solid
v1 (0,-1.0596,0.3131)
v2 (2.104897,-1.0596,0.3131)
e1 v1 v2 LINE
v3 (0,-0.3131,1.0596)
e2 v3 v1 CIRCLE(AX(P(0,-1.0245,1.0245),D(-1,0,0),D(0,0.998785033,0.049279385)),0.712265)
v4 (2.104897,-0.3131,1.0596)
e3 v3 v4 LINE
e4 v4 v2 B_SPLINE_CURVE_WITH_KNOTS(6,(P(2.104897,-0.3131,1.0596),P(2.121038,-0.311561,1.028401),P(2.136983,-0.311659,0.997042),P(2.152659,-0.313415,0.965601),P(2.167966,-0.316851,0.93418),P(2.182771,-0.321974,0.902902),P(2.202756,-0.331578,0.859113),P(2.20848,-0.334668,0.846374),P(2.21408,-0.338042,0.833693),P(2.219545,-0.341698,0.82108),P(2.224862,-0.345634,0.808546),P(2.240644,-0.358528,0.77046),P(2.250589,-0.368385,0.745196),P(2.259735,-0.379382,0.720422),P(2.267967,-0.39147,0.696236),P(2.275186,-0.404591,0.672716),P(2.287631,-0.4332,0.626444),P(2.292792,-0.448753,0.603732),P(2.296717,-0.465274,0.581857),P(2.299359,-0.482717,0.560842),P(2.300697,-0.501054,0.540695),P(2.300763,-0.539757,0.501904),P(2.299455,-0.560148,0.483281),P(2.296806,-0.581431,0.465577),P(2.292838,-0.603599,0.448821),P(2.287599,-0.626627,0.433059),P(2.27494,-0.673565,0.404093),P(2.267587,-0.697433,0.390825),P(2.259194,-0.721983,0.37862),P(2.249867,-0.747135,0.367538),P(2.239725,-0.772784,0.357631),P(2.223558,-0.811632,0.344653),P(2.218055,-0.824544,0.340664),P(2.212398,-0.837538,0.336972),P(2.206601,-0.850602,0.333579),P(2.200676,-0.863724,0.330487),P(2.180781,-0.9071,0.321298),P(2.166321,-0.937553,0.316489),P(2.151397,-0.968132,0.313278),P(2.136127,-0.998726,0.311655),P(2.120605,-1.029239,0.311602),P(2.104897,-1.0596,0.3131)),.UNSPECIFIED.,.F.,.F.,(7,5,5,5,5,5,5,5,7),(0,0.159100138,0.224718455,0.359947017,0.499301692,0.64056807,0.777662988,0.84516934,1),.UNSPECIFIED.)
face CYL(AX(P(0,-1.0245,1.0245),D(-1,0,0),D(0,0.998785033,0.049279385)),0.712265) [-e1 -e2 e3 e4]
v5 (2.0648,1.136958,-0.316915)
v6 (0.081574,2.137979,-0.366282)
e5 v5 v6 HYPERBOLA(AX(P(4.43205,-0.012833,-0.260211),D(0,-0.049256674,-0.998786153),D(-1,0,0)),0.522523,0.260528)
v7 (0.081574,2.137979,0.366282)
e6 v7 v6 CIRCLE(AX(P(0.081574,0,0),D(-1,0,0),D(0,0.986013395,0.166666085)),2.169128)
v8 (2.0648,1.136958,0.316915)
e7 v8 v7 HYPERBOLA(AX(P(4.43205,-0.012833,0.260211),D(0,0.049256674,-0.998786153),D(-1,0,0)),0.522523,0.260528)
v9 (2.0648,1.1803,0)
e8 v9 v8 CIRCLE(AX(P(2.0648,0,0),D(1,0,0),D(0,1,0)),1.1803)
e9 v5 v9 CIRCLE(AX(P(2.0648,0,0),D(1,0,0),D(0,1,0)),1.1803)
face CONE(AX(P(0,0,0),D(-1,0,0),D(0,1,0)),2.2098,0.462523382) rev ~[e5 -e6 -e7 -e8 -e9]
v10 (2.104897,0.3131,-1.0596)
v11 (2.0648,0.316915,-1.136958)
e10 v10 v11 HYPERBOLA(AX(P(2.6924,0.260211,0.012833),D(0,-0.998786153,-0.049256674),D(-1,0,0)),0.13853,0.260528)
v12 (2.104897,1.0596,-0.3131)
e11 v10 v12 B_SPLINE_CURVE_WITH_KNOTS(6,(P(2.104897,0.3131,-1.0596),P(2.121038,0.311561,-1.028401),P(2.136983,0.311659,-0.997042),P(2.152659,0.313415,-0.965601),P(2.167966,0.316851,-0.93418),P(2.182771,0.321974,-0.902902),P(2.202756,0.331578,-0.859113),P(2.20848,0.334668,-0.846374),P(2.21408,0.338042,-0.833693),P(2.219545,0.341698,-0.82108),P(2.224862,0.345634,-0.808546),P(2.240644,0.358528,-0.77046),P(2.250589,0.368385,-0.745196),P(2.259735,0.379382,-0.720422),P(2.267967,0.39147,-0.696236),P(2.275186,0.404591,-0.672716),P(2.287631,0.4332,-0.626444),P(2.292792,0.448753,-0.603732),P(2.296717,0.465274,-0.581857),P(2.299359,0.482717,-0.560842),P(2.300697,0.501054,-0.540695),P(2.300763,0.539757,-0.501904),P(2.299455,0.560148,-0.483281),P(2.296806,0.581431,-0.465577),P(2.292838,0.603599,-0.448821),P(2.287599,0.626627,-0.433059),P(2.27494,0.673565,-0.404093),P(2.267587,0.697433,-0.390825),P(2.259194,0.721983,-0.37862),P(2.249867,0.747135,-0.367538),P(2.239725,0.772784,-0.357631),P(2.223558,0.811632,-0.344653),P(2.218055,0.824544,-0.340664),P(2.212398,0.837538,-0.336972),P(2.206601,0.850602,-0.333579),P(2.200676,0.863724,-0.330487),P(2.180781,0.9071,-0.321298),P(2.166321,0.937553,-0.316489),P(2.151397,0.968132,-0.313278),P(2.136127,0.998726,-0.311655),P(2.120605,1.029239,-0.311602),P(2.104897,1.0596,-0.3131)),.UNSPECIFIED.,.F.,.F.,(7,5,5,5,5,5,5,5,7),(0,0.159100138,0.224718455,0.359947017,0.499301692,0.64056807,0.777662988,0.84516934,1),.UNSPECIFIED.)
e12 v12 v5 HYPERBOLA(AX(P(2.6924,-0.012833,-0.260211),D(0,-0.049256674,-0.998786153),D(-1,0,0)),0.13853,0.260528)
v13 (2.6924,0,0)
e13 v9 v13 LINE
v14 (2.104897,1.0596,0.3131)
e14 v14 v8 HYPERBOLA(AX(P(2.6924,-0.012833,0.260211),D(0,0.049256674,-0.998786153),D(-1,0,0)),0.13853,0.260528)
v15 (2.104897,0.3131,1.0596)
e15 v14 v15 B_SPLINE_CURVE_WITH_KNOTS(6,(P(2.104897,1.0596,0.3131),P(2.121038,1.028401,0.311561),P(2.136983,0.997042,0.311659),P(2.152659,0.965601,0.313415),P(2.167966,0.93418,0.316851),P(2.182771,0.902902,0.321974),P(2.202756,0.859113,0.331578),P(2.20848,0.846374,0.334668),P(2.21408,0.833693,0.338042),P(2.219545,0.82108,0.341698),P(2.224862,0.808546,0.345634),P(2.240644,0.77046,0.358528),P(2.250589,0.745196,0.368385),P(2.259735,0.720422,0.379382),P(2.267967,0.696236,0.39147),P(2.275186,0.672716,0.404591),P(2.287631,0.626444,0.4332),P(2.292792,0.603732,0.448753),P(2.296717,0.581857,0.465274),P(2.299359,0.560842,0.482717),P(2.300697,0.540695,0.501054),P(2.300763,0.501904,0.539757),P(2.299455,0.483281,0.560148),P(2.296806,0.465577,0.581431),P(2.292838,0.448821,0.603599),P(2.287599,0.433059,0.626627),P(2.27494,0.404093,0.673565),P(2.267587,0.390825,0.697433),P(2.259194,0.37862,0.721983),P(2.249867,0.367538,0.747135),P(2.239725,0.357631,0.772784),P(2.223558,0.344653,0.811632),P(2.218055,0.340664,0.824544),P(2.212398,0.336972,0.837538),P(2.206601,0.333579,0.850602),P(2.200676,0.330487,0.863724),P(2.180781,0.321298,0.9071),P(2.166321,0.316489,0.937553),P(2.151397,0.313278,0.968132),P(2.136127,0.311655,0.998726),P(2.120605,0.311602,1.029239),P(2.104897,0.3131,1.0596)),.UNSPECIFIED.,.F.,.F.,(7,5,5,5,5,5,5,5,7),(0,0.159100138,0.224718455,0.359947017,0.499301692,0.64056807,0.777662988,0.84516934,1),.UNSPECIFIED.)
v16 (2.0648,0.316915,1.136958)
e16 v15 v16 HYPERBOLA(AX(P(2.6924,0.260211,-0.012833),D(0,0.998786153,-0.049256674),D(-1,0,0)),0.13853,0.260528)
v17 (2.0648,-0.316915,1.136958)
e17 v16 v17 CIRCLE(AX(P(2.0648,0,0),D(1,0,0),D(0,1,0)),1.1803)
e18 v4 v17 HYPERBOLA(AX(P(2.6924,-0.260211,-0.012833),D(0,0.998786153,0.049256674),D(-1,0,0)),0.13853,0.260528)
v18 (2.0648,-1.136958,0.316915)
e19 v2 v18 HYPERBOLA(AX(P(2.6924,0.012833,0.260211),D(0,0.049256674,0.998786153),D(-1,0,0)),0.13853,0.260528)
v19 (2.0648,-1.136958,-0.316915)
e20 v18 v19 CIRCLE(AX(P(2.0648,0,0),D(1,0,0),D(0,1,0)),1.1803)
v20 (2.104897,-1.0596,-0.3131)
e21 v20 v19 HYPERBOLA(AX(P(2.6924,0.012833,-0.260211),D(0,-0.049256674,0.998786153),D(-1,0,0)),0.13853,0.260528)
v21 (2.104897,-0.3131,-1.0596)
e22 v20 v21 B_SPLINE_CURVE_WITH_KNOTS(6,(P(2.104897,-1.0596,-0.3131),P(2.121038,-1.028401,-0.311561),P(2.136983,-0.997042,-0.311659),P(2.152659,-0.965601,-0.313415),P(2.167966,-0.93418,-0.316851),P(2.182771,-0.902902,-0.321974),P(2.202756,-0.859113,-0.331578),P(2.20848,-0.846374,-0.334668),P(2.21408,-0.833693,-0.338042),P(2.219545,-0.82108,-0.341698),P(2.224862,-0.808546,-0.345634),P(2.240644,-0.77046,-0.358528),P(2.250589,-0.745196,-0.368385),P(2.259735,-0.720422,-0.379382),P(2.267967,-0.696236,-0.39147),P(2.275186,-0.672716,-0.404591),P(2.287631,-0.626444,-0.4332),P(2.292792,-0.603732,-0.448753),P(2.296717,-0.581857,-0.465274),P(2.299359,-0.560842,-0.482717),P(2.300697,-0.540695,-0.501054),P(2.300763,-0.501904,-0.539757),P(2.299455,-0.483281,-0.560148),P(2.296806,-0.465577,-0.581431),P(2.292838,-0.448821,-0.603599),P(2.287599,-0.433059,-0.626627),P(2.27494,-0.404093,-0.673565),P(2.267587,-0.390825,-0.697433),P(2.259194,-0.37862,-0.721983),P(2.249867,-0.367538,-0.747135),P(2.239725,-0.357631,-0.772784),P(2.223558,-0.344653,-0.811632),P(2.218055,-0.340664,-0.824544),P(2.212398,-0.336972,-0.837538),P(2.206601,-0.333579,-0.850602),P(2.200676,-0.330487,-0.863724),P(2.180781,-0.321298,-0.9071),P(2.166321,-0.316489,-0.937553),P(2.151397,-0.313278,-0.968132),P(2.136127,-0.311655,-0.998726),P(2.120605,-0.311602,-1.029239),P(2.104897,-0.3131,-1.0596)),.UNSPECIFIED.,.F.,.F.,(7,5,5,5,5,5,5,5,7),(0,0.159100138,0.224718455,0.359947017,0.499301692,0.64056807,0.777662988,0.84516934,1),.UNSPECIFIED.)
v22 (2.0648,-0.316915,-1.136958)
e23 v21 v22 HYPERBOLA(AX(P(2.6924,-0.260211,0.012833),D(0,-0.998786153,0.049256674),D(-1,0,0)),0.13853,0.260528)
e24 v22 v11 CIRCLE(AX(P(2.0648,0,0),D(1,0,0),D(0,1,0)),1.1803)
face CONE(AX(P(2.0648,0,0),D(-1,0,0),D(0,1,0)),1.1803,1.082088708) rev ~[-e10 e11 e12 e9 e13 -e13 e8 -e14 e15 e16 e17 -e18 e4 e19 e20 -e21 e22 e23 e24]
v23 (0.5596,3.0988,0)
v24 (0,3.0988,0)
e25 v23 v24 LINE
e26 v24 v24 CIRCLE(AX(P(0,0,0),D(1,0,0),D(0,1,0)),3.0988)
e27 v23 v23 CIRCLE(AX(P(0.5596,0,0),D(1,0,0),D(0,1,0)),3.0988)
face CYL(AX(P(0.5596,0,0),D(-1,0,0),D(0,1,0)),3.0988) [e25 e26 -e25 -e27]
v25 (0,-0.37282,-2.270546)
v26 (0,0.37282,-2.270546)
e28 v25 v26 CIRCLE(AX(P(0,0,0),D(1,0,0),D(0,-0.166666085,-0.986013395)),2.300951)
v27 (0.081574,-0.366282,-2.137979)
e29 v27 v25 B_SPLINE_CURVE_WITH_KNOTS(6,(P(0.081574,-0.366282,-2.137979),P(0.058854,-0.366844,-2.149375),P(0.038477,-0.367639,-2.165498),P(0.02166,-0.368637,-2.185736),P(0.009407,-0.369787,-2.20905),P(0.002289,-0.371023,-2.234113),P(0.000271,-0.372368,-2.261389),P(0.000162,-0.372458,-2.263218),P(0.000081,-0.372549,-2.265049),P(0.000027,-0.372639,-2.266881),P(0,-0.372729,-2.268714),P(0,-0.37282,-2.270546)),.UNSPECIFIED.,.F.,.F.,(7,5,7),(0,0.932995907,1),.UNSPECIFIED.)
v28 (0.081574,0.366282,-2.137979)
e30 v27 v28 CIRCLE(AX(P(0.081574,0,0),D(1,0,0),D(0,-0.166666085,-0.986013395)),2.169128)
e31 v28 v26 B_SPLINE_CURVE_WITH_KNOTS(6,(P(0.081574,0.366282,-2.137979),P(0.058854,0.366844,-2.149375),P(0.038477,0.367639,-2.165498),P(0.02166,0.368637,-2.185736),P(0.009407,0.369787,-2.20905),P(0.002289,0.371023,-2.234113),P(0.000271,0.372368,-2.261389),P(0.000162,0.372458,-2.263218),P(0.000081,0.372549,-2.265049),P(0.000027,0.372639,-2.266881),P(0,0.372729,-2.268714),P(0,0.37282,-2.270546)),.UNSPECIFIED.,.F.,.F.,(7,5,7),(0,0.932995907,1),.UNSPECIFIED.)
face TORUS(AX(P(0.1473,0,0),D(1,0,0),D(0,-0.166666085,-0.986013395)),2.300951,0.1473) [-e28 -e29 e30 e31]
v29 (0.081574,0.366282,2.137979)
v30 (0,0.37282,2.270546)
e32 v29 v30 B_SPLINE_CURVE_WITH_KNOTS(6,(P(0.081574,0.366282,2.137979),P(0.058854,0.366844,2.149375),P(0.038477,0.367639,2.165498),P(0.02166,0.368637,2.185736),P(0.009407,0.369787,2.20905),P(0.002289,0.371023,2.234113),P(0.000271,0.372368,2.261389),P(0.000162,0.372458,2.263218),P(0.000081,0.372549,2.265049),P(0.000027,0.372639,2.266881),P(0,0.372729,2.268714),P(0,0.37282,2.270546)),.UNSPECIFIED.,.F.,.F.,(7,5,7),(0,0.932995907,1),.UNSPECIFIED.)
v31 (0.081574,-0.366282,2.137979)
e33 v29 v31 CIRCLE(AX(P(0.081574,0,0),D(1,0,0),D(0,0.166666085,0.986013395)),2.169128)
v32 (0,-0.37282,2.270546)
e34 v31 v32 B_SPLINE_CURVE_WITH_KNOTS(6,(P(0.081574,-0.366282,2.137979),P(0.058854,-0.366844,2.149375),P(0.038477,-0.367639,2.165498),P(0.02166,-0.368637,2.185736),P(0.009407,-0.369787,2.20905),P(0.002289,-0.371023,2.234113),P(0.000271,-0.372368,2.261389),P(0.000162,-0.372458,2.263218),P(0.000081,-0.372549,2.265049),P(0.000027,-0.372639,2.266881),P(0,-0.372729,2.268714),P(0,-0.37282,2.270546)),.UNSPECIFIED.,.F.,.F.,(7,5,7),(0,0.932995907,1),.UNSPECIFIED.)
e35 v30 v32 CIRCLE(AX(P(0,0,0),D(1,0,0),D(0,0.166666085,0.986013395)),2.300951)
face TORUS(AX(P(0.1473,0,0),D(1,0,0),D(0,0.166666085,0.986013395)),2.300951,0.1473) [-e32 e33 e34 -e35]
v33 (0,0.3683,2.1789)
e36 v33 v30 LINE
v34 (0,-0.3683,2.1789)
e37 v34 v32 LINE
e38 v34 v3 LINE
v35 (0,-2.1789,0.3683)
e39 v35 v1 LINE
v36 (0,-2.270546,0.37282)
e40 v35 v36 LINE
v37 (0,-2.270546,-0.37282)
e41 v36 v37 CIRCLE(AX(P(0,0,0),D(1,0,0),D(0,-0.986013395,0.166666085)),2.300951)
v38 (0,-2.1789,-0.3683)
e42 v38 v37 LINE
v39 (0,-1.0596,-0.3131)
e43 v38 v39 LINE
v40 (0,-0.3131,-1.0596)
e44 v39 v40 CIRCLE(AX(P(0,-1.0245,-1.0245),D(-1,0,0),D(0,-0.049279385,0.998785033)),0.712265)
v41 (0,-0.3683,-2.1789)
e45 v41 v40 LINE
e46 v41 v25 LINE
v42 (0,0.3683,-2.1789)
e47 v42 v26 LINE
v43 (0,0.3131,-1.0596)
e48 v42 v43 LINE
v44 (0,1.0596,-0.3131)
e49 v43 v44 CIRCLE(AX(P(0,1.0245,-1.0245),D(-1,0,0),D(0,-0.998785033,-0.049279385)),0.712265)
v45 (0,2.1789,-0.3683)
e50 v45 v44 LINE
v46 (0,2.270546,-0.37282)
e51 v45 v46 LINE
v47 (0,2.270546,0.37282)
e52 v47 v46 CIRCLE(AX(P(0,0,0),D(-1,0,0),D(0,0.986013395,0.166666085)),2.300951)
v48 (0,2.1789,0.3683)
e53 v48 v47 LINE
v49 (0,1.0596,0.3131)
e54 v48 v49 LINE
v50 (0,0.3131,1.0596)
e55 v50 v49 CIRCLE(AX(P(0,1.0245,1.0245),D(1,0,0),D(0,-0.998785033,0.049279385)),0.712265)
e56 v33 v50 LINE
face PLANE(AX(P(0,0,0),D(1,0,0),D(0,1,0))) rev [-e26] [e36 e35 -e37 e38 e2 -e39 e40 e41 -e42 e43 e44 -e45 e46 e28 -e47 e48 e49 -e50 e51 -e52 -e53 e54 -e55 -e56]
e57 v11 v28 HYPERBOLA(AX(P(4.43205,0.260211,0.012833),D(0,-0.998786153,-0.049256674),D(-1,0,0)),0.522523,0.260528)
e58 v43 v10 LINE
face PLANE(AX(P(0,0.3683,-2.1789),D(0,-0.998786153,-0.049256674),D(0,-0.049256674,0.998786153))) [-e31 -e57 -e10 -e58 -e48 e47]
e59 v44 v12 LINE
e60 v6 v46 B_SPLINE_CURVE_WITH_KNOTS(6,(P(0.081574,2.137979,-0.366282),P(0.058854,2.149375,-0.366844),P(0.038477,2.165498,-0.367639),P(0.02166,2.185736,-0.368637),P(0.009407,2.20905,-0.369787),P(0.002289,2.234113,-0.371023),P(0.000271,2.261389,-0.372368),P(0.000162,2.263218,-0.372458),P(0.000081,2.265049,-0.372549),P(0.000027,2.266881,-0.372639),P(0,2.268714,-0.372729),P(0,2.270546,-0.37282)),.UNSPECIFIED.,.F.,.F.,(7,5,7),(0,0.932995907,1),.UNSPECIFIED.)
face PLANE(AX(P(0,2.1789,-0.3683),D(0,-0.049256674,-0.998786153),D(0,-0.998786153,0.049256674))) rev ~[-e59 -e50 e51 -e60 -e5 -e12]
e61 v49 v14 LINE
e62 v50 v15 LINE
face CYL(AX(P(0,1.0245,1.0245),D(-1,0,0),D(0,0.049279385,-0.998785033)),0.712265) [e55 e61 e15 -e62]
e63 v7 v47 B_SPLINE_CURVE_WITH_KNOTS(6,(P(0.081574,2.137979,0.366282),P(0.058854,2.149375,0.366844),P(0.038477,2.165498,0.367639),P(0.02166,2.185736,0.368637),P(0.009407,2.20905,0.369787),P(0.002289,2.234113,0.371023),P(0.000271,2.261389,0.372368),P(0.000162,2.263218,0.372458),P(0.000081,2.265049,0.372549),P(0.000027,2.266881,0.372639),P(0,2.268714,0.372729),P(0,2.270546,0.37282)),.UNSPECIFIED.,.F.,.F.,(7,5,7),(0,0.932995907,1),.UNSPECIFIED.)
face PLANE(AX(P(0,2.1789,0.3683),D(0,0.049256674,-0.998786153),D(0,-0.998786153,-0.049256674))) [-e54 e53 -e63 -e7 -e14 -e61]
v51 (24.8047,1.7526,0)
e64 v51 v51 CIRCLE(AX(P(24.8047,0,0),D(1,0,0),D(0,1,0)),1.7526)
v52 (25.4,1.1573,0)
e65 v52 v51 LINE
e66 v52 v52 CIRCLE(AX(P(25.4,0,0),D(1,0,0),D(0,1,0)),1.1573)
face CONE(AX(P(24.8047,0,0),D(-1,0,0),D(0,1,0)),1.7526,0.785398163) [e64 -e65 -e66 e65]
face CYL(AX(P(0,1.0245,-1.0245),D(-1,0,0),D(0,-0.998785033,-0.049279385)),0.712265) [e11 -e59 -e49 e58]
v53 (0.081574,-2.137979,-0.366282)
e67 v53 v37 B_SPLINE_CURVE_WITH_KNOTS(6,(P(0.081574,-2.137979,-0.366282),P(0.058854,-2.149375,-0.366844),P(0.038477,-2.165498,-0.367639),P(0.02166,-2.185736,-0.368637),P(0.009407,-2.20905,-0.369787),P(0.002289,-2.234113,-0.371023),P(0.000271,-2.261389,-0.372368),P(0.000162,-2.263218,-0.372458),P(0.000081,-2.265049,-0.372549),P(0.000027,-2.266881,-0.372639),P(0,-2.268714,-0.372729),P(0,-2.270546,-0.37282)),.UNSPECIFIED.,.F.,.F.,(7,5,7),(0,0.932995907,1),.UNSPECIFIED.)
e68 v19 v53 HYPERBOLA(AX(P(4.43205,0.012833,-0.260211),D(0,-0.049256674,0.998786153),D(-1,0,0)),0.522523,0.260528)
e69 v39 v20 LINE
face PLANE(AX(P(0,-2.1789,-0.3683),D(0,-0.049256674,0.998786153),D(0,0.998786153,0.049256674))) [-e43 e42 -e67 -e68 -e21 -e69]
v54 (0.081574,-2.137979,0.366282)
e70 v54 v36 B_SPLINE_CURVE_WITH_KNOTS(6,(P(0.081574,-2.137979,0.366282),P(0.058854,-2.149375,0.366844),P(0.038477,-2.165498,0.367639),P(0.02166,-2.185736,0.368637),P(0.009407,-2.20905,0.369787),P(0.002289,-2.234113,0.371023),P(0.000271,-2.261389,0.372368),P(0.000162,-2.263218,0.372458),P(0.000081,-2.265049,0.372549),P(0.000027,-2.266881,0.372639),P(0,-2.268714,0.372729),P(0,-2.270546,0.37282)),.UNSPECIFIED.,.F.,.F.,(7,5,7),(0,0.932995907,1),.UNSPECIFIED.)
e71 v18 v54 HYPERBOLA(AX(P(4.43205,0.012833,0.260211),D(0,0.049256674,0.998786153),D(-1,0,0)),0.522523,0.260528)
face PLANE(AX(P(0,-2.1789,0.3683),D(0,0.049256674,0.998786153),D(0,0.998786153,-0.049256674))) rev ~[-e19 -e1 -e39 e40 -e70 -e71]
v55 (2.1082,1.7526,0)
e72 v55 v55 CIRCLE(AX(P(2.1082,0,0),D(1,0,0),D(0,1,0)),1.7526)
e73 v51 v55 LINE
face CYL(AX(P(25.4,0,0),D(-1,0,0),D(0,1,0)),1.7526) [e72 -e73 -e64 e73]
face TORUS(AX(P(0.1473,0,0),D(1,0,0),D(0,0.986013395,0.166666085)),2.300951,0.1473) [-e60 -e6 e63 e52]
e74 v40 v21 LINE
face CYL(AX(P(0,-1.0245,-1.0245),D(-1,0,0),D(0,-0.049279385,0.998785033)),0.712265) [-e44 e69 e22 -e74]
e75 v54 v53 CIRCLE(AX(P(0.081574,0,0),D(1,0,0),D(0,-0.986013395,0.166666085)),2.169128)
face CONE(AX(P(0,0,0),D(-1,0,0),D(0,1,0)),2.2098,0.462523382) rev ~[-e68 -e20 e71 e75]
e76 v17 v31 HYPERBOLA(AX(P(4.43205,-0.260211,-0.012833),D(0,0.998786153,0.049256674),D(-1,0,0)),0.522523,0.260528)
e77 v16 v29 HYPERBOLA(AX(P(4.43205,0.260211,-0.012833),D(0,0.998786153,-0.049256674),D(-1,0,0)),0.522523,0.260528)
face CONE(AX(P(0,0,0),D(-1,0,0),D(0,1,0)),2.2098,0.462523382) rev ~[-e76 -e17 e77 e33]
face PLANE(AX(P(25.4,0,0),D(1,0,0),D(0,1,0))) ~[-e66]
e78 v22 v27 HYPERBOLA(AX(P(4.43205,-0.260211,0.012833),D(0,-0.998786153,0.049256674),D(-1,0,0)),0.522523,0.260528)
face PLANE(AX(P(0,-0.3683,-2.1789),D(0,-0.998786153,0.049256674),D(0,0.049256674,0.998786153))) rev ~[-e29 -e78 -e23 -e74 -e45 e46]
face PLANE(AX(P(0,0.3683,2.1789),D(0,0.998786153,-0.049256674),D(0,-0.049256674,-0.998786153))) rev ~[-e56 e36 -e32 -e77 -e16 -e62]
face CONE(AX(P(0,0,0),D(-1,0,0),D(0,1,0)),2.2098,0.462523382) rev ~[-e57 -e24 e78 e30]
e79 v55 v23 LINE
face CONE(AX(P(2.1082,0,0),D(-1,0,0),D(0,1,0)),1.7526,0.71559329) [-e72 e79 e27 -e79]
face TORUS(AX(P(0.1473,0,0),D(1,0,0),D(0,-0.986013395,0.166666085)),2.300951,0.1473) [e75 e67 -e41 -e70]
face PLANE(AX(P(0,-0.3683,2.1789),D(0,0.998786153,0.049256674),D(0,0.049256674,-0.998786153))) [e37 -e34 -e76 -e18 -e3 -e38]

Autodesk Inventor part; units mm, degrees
ref_plane "YZ Plane" through (0, 0, 0) normal (1, 0, 0) x (0, 1, 0)
ref_plane "XZ Plane" through (0, 0, 0) normal (0, 1, 0) x (-1, 0, 0)
sketch "Sketch1" plane through (0, 0, 0) normal (0, 0, 1) x (1, 0, 0)
  line L0 (2.6924, 0) -> (25.4, 0)
  line L1 (25.4, 0) -> (25.4, 1.7526)
  line L2 (25.4, 1.7526) -> (2.1082, 1.7526)
  line L3 (0.5596, 3.0988) -> (0, 3.0988)
  line L4 (-5.08, 0) -> (30.48, 0) projected
  line L5 (0, -0.6198) -> (0, 3.7186) projected
  line L6 (0, 2.2098) -> (2.0648, 1.1803)
  line L7 (2.0648, 1.1803) -> (2.6924, 0)
  line L8 (2.1082, 1.7526) -> (0.5596, 3.0988)
  line L9 (0, 3.0988) -> (0, 2.2098)
  dimension "d2" = 3.5052
  dimension "d3" = 6.1976
  dimension "d4" = 2.6924
  dimension "d5" = 4.4196
  dimension "d6" = 26.5
  dimension "d7" = 62
  dimension "d13" = 41
  dimension "d14" = 2.1082
  dimension "d15" = 25.4
revolve "Body" add sketch "Sketch1" angle 360 about axis through (2.6924, 0, 0) along (1, 0, 0) contours L7 L6 L5 L3 L8 L2 L1 L0
sketch "Sketch2" plane through (0, 0, 0) normal (-1, 0, 0) x (0, 0, 1)
  line L0 (0, -4.3383) -> (0, 4.3383) projected
  line L1 (-4.3383, 0) -> (4.3383, 0) projected
  line L2 (0, 2.2098) -> (0, 0) construction
  line L3 (0, 0) -> (2.2098, 0) construction
  arc A0 (0.7366, 0) -> (0, 0.7366) centre (0, 0) ccw
  line L4 (0, 0) -> (0.7947, 0.7947) construction
  arc A1 (1.1049, 0) -> (0, 1.1049) centre (0, 0) ccw construction
  line L5 (0.3683, 2.1789) -> (0.3131, 1.0596)
  line L6 (2.1789, 0.3683) -> (1.0596, 0.3131)
  arc A2 (0.3131, 1.0596) -> (1.0596, 0.3131) centre (1.0245, 1.0245) ccw
  arc A3 (2.2098, 0) -> (2.1789, 0.3683) centre (0, 0) ccw
  arc A4 (0.3683, 2.1789) -> (0, 2.2098) centre (0, 0) ccw
  arc A5 (2.1789, 0.3683) -> (0.3683, 2.1789) centre (0, 0) ccw
  line L7 (0.3683, -2.1789) -> (0.3131, -1.0596)
  line L8 (2.1789, -0.3683) -> (1.0596, -0.3131)
  arc A6 (1.0596, -0.3131) -> (0.3131, -1.0596) centre (1.0245, -1.0245) ccw
  arc A7 (2.1789, -0.3683) -> (2.2098, 0) centre (0, 0) ccw
  arc A8 (0, -2.2098) -> (0.3683, -2.1789) centre (0, 0) ccw
  arc A9 (0.3683, -2.1789) -> (2.1789, -0.3683) centre (0, 0) ccw
  line L9 (-0.3683, 2.1789) -> (-0.3131, 1.0596)
  line L10 (-2.1789, 0.3683) -> (-1.0596, 0.3131)
  arc A10 (-1.0596, 0.3131) -> (-0.3131, 1.0596) centre (-1.0245, 1.0245) ccw
  arc A11 (-2.1789, 0.3683) -> (-2.2098, 0) centre (0, 0) ccw
  arc A12 (0, 2.2098) -> (-0.3683, 2.1789) centre (0, 0) ccw
  arc A13 (-0.3683, 2.1789) -> (-2.1789, 0.3683) centre (0, 0) ccw
  arc A14 (-2.1789, -0.3683) -> (-0.3683, -2.1789) centre (0, 0) ccw
  arc A15 (-0.3683, -2.1789) -> (0, -2.2098) centre (0, 0) ccw
  arc A16 (-2.2098, 0) -> (-2.1789, -0.3683) centre (0, 0) ccw
  line L11 (-2.1789, -0.3683) -> (-1.0596, -0.3131)
  arc A17 (-0.3131, -1.0596) -> (-1.0596, -0.3131) centre (-1.0245, -1.0245) ccw
  line L12 (-0.3683, -2.1789) -> (-0.3131, -1.0596)
  dimension "d18" = 45
  dimension "d19" = 1.4732
  dimension "d20" = 2.2098
  dimension "d21" = 4.4196
  dimension "d22" = 0.3683
extrude "Slot" add sketch "Sketch2" against normal up to next contours A2 L5 A5 L6 | L9 A10 L10 A13 | L7 A6 L8 A9 | A14 L11 A17 L12
fillet "Fillet1" radius 0.1473 4 edges at (0, 2.2098, 0) (0, 0, 2.2098) (0, -2.2098, 0) (0, 0, -2.2098)
thread "Thread" size "6-32 UNC" class "2A" standard "ANSI Unified Screw Threads" length 19.05
chamfer "Chamfer1" distance 0.5953 distance2 0.5953 1 edges at (25.4, -1.7526, 0) measured on face at (25.4, -0.4373, -0.5742)
ref_plane "Work Plane2" through (2.032, 0, 0) normal (0, 1, 0) x (1, 0, 0)
equation "\"d2\" = GD"
equation "\"d3\" = KOD"
equation "\"d4\" = INTI"
equation "\"d5\" = SDM"
equation "\"d13\" = 0.5 * SEWI"
equation "\"d14\" = KOH"
equation "\"d15\" = NLG"
equation "\"d19\" = 0.333333 * SDM"
equation "\"d20\" = 0.5 * SDM"
equation "\"d21\" = SDM"
equation "\"d22\" = 0.5 * SBR"
equation "\"d45\" = INTI"
equation "\"d25\" = 0.2 * SBR"
equation "\"d9\" = GEL"
equation "\"d11\" = -0.5 * SPD + 0.5 * GD"
equation "\"d12\" = GUL"
equation "\"GD\" = NND"
equation "\"NLG\" = 25.4"
equation "\"GEL\" = 19.05"
equation "\"KOD\" = 6.1976"
equation "\"KOH\" = 2.1082"
equation "\"SDM\" = 4.4196"
equation "\"INTI\" = 2.6924"
equation "\"SBR\" = 0.7366"
equation "\"GUL\" = 0.75 * GAL"
equation "\"SPD\" = 2.31458"
equation "\"SEWI\" = 82deg"
equation "\"d0\" = NLG"
equation "\"d1\" = KOH"
equation "\"d17\" = SDM"
equation "\"TOA\" = 30deg"
equation "\"THREADDIA\" = 3.5052"
equation "\"BDM\" = NND"
equation "\"NND\" = 3.5052"
equation "\"GAL\" = 0.79375"
equation "\"GD1\" = SPD"
properties part number "ANSI B18.6.3 - 6-32 x 1, CRFCHMSTII(5)" material "Steel, Mild"
